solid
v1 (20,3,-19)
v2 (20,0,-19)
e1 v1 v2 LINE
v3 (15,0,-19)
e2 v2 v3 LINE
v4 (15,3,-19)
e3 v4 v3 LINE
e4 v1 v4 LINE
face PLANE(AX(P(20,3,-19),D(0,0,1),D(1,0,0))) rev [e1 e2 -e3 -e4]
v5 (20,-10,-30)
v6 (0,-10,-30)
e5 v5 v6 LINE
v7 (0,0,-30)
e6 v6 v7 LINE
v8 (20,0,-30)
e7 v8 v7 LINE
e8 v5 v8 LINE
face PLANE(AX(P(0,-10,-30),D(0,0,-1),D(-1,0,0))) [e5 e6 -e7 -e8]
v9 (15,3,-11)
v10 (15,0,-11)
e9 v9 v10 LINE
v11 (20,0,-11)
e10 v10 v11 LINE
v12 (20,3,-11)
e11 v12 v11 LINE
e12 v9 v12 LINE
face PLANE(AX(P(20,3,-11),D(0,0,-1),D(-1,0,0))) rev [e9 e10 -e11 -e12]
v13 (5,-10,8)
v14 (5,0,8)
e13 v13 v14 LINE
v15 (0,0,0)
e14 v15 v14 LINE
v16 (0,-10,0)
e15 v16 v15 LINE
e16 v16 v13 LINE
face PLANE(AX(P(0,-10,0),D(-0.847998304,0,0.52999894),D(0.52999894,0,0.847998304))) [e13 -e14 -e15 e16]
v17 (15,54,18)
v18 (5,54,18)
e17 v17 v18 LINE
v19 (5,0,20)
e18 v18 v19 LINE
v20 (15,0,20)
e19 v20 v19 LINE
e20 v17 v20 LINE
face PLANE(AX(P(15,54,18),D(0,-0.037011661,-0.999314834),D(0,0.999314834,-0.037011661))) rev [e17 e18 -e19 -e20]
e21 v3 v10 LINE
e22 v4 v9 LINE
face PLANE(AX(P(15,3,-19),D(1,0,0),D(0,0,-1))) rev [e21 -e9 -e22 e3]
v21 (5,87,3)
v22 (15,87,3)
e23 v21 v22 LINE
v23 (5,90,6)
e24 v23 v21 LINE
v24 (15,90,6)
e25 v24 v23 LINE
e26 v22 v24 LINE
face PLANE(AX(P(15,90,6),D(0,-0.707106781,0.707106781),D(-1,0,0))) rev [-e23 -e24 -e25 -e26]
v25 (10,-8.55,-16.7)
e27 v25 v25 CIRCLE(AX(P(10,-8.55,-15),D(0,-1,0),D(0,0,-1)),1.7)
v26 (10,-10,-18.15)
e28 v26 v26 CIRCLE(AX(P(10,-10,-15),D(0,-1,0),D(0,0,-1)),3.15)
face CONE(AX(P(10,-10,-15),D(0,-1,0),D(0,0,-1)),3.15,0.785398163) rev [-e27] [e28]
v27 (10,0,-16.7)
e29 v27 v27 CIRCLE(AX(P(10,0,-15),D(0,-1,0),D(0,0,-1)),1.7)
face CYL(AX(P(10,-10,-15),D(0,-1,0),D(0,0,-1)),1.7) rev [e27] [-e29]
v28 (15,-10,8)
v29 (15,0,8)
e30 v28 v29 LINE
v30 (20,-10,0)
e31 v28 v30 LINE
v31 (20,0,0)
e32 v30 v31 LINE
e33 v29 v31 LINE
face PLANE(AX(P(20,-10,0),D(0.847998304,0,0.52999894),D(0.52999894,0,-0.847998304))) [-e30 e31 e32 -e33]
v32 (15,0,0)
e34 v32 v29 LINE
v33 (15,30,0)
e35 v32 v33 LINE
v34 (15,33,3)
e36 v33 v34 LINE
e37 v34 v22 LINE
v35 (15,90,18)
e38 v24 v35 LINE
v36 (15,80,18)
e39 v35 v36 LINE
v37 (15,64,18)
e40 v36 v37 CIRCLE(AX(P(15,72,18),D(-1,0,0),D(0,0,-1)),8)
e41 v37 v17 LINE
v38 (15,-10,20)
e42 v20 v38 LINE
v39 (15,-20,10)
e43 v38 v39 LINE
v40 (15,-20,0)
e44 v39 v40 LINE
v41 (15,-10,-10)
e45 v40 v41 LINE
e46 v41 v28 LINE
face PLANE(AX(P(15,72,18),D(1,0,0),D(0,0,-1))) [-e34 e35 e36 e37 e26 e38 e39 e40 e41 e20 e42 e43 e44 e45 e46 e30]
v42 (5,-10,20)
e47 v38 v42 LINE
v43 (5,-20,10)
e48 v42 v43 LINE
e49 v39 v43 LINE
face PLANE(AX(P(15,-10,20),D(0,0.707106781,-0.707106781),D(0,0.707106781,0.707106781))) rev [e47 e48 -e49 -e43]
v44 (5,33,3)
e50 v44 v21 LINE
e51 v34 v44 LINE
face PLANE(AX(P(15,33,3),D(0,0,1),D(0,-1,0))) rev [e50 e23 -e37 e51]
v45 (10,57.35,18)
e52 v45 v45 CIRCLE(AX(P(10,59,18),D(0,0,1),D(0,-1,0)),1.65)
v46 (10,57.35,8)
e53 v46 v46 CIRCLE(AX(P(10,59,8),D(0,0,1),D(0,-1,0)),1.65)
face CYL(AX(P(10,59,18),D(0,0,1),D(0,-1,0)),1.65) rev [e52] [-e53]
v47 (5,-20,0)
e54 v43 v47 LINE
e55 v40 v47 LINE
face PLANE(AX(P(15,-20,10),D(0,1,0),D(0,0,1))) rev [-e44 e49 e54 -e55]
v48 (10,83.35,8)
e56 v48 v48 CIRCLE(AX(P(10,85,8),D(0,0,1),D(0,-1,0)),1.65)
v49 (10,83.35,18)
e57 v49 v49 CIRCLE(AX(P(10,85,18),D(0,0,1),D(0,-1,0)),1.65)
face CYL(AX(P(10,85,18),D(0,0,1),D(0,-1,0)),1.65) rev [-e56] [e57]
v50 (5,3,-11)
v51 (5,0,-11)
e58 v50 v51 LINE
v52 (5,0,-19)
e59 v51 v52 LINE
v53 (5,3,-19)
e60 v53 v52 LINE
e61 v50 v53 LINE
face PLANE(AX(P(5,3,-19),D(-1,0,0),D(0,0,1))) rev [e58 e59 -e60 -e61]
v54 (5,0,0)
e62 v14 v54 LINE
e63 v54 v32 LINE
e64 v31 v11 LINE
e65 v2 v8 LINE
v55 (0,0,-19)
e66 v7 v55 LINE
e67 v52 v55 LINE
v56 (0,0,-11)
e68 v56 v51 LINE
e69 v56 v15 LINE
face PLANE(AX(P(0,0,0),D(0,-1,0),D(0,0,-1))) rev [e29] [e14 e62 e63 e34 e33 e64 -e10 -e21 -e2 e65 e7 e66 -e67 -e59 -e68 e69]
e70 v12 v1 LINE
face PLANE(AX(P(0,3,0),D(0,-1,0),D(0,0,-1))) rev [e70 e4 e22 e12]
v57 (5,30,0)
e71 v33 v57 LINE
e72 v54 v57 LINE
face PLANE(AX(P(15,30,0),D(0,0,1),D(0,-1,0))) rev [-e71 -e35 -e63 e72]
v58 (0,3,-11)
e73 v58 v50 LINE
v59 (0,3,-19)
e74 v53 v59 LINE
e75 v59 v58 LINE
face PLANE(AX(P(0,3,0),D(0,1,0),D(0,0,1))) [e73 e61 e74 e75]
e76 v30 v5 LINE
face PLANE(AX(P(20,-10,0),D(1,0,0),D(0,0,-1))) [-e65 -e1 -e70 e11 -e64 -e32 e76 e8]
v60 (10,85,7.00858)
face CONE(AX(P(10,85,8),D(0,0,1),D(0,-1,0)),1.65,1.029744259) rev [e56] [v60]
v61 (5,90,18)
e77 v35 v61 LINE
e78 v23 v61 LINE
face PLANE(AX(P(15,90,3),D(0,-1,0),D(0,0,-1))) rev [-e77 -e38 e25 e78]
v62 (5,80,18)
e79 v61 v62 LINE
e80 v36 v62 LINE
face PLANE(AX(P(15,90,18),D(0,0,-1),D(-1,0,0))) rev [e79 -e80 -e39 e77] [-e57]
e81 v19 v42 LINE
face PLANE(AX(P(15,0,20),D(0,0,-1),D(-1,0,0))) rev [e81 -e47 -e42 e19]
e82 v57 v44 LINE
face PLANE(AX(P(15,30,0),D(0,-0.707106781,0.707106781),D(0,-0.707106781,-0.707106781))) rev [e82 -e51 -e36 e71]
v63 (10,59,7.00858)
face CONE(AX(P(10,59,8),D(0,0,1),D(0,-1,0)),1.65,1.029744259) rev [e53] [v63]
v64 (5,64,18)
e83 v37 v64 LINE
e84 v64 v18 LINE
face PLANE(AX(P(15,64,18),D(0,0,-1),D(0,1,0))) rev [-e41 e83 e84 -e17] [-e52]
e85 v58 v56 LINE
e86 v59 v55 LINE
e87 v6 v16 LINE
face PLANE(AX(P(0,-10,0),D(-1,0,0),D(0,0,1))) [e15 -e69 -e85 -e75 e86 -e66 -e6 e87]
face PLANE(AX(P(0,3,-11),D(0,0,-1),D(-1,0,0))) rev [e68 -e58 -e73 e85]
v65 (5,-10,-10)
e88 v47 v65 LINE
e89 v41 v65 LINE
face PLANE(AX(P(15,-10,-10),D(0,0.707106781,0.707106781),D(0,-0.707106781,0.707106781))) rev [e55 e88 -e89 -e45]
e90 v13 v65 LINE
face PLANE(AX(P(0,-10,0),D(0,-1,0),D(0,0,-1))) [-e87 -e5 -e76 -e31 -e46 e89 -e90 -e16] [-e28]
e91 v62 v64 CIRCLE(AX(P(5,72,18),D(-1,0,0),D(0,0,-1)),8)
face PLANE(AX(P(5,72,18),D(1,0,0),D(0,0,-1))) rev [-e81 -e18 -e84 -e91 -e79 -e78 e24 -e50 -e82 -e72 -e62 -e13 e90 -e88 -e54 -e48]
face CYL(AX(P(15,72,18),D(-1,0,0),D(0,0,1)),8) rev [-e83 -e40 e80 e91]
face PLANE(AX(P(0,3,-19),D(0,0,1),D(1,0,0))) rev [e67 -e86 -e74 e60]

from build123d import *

# Parameters (mm, degrees)
EXTRUDE_1_DEPTH = 10
EXTRUDE_2_DEPTH = 5
SKETCH_4_W      = 5
SKETCH_4_H      = 8
EXTRUDE_3_DEPTH = 3
CHAMFER_1_SIZE  = 3


# Read off the part's stored shape, not the designer's step: 高级异型孔3, 高级异型孔4
with BuildPart() as part:
    # 草图1 → 凸台-拉伸1 (new body)
    with BuildSketch(Plane(origin=(0, 0, 0), x_dir=(1, 0, 0), z_dir=(0, 1, 0))):
        Polygon((0, 0), (5, -8), (5, 0), (15, 0), (15, -8), (20, 0), (20, 30), (0, 30), align=None)
    extrude(amount=-EXTRUDE_1_DEPTH)

    # 草图2 → 凸台-拉伸2 (add, symmetric)
    with BuildSketch(Plane(origin=(10, 0, 0), x_dir=(0, 0, -1), z_dir=(1, 0, 0))):
        with BuildLine():
            Line((0, 30), (-3, 33))
            Line((-3, 33), (-3, 90))
            Line((-3, 90), (-18, 90))
            Line((-18, 90), (-18, 80))
            ThreePointArc((-18, 80), (-10, 72), (-18, 64))
            Line((-18, 64), (-18, 54))
            Line((-18, 54), (-20, 0))
            Line((-20, 0), (-20, -10))
            Line((-20, -10), (-10, -20))
            Line((-10, -20), (0, -20))
            Line((0, -20), (10, -10))
            Line((10, -10), (0, -10))
            Line((0, -10), (0, 30))
        make_face()
    extrude(amount=EXTRUDE_2_DEPTH, both=True)

    # 草图4 → 凸台-拉伸3 (add)
    with BuildSketch(Plane(origin=(0, 0, 0), x_dir=(1, 0, 0), z_dir=(0, 1, 0))):
        with Locations((2.5, 15)):
            Rectangle(SKETCH_4_W, SKETCH_4_H)
        with Locations((17.5, 15)):
            Rectangle(SKETCH_4_W, SKETCH_4_H)
    extrude(amount=EXTRUDE_3_DEPTH)

    # 高级异型孔3 outline → 高级异型孔3 (revolve, cut)
    with BuildSketch(Plane(origin=(10, 0, -15), x_dir=(1, 0, 0), z_dir=(0, 0, 1))):
        Polygon((0, -10), (3.15, -10), (1.7, -8.55), (1.7, 0), (0, 0), align=None)
    revolve(axis=Axis((10, 0, -15), (0, 1, 0)), mode=Mode.SUBTRACT)

    # 高级异型孔4 outline → 高级异型孔4 (revolve, cut)
    with BuildSketch(Plane(origin=(10, 59, 0), x_dir=(1, 0, 0), z_dir=(0, -1, 0))):
        Polygon((0, 7.008579979), (1.65, 8), (1.65, 18), (0, 18), align=None)
    revolve(axis=Axis((10, 59, 0), (0, 0, 1)), mode=Mode.SUBTRACT)

    # Other 4 2 outline → Other 4 2 (revolve, cut)
    with BuildSketch(Plane(origin=(10, 85, 0), x_dir=(1, 0, 0), z_dir=(0, -1, 0))):
        Polygon((0, 7.008579979), (1.65, 8), (1.65, 18), (0, 18), align=None)
    revolve(axis=Axis((10, 85, 0), (0, 0, 1)), mode=Mode.SUBTRACT)

    # 倒角1
    chamfer_1_edges = [part.edges().sort_by_distance(p)[0] for p in [
        (10, 90, 3),
    ]]
    chamfer(chamfer_1_edges, length=CHAMFER_1_SIZE)


solid = part.part
